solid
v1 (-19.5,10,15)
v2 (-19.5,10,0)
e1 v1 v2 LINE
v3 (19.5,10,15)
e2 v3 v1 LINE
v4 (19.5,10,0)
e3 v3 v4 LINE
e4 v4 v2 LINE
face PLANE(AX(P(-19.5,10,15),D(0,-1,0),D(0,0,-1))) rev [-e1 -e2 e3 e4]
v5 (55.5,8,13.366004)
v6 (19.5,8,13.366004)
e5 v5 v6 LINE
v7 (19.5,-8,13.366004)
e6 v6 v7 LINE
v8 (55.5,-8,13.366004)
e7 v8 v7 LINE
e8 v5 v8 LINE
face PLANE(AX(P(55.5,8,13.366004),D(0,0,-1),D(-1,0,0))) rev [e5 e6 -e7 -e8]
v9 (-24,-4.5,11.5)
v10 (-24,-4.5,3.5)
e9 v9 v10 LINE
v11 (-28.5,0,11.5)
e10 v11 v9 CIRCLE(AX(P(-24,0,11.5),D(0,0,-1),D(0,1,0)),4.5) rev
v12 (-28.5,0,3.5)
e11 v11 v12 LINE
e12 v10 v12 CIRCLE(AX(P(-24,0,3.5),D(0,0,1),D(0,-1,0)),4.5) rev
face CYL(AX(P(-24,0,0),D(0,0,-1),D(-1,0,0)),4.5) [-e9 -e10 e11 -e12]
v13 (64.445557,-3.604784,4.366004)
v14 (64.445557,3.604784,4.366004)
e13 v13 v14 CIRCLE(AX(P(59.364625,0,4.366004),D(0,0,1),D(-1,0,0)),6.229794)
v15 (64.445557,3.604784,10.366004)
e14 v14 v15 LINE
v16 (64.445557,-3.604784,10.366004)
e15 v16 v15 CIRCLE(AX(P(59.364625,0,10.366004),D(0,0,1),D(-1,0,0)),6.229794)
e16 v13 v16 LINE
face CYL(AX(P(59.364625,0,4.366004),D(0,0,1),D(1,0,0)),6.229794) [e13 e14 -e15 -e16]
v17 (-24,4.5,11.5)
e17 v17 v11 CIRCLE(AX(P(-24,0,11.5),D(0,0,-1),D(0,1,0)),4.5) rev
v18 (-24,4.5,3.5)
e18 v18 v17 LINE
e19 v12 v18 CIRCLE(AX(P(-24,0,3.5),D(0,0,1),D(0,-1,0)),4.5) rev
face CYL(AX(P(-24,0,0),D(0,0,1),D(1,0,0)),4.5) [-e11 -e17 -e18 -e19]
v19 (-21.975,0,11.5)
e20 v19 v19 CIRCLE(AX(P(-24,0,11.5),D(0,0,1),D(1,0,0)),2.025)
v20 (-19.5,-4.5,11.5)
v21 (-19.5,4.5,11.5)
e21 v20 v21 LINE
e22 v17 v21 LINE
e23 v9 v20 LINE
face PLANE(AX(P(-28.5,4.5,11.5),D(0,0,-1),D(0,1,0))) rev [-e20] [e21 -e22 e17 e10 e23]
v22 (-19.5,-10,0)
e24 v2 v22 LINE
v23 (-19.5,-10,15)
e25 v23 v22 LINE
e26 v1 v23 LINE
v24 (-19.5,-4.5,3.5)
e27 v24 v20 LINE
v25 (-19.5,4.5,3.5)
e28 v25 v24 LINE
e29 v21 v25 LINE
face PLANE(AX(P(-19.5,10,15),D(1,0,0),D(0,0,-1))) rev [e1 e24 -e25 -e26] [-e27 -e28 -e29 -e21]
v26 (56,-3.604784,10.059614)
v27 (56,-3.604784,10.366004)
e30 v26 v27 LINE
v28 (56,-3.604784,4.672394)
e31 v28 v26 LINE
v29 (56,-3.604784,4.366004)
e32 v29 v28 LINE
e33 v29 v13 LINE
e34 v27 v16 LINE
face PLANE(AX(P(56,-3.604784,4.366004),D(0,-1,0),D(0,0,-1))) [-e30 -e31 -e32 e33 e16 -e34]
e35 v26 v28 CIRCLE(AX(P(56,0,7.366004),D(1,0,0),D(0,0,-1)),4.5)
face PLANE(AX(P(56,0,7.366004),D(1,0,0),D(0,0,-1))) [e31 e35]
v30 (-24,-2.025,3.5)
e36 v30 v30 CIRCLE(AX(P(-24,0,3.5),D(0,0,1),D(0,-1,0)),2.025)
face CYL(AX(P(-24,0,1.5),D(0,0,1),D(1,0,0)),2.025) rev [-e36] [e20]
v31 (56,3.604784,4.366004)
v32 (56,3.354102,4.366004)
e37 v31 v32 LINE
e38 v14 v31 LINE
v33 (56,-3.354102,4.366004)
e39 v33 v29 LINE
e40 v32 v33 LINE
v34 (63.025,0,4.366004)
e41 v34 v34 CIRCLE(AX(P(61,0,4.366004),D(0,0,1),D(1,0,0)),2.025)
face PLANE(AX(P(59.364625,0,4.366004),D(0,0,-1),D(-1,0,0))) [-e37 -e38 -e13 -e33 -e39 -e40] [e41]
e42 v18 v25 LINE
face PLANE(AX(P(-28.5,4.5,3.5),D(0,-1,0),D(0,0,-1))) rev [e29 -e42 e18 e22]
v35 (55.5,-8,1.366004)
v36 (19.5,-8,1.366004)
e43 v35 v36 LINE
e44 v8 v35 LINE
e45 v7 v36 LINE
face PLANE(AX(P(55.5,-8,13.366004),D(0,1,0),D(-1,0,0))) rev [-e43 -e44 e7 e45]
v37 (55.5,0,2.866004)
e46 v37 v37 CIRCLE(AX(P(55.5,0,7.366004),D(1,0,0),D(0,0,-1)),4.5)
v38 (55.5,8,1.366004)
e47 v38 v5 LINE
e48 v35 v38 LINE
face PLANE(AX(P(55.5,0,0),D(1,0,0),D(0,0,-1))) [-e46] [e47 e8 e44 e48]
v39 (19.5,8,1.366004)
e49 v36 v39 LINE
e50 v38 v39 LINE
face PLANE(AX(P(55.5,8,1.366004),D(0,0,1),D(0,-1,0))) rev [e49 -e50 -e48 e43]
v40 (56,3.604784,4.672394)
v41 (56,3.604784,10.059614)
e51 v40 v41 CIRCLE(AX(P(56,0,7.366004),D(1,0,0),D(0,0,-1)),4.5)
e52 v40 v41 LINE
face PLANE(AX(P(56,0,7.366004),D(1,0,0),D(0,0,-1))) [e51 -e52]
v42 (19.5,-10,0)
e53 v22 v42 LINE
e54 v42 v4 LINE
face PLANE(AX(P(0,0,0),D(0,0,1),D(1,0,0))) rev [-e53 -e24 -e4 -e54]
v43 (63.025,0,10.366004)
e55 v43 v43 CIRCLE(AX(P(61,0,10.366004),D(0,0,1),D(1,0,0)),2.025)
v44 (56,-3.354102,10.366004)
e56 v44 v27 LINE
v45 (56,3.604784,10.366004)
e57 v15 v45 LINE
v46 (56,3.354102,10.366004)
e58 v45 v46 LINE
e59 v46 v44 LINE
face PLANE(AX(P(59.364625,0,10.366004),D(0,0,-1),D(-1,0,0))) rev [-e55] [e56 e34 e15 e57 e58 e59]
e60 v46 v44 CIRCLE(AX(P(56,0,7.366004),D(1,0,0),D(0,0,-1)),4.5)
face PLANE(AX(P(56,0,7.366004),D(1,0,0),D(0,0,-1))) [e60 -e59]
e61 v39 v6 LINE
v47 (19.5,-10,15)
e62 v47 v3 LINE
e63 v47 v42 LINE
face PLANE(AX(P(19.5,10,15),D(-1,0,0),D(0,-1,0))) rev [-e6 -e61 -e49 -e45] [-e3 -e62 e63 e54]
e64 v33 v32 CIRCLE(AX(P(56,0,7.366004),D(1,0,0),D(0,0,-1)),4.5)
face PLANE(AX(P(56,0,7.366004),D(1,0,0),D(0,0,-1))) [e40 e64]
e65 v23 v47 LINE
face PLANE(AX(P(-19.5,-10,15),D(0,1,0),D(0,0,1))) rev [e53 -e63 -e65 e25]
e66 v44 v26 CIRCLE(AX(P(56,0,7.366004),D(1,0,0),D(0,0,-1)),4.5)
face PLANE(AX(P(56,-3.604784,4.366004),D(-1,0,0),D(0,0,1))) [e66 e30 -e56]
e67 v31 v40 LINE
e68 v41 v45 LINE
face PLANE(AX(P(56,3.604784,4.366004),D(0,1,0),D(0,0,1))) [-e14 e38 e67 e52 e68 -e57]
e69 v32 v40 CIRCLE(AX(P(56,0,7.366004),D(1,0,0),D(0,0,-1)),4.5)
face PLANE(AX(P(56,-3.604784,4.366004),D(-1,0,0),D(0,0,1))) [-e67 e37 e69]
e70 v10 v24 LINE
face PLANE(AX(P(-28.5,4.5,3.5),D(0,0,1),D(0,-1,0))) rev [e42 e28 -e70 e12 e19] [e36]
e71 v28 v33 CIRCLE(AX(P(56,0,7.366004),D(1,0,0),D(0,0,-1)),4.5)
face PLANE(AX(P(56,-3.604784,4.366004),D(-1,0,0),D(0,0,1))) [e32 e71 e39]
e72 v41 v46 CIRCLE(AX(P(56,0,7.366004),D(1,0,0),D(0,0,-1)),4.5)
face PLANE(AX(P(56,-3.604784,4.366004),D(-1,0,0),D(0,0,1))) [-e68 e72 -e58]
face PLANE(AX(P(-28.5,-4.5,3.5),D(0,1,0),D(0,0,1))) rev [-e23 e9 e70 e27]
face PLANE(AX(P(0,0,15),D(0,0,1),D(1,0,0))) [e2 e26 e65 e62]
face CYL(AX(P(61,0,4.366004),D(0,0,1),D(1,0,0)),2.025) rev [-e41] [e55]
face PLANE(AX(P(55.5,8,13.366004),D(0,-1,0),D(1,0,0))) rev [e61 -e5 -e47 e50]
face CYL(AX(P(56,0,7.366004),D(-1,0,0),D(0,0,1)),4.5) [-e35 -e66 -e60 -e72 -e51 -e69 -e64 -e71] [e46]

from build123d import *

# Parameters (mm, degrees)
SKETCH_1_W           = 39
SKETCH_1_H           = 20
EXTRUDE_1_DEPTH      = 15
SKETCH_2_W           = 8
SKETCH_2_H           = 9
EXTRUDE_2_DEPTH      = 9
SKETCH_3_R           = 2.025
CUT_EXTRUDE_1_DEPTH  = 10
FILLET_1_R           = 4.5
SKETCH_4_W           = 12
SKETCH_4_H           = 16
EXTRUDE_3_DEPTH      = 36
SKETCH_5_R           = 4.5
EXTRUDE_4_DEPTH      = 0.5
EXTRUDE_5_DEPTH      = 3
EXTRUDE_5_DEPTH_BACK = 3
SKETCH_7_R           = 2.025


with BuildPart() as part:
    # 스케치1 → 보스-돌출1 (new body)
    with BuildSketch(Plane.XY):
        Rectangle(SKETCH_1_W, SKETCH_1_H)
    extrude(amount=EXTRUDE_1_DEPTH)

    # 스케치2 → 보스-돌출2 (add)
    with BuildSketch(Plane.ZY.offset(19.5)):
        with Locations((7.5, 0)):
            Rectangle(SKETCH_2_W, SKETCH_2_H)
    extrude(amount=EXTRUDE_2_DEPTH)

    # 스케치3 → 컷-돌출1 (cut)
    with BuildSketch(Plane.XY.offset(11.5)):
        with Locations((-24, 0)):
            Circle(SKETCH_3_R)
    extrude(amount=-CUT_EXTRUDE_1_DEPTH, mode=Mode.SUBTRACT)

    # 필렛1
    fillet_1_edges = [part.edges().sort_by_distance(p)[0] for p in [
        (-28.5, -4.5, 7.5),
        (-28.5, 4.5, 7.5),
    ]]
    fillet(fillet_1_edges, radius=FILLET_1_R - 0.0001)  # a hair under: the kernel refuses the full size

    # 스케치4 → 보스-돌출3 (add)
    with BuildSketch(Plane(origin=(19.5, 0, 0), x_dir=(0, 0, -1), z_dir=(1, 0, 0))):
        with Locations((-7.366003783, 0)):
            Rectangle(SKETCH_4_W, SKETCH_4_H)
    extrude(amount=EXTRUDE_3_DEPTH)

    # 스케치5 → 보스-돌출4 (add)
    with BuildSketch(Plane(origin=(55.5, 0, 0), x_dir=(0, 0, -1), z_dir=(1, 0, 0))):
        with Locations((-7.366003783, 0)):
            Circle(SKETCH_5_R)
    extrude(amount=EXTRUDE_4_DEPTH)

    # 스케치7 → 보스-돌출5 (add, two sides: drawn at the far end of the back side and taken through both)
    with BuildSketch(Plane.XY.offset(7.366003783).offset(-EXTRUDE_5_DEPTH_BACK)):
        with BuildLine():
            Line((56, -3.604783634), (64.44555705, -3.604783634))
            ThreePointArc((64.44555705, -3.604783634), (65.594419255, 0), (64.44555705, 3.604783634))
            Line((64.44555705, 3.604783634), (56, 3.604783634))
            Line((56, 3.604783634), (56, -3.604783634))
        make_face()
        with Locations((61, 0)):
            Circle(SKETCH_7_R, mode=Mode.SUBTRACT)
    extrude(amount=EXTRUDE_5_DEPTH + EXTRUDE_5_DEPTH_BACK)


solid = part.part
